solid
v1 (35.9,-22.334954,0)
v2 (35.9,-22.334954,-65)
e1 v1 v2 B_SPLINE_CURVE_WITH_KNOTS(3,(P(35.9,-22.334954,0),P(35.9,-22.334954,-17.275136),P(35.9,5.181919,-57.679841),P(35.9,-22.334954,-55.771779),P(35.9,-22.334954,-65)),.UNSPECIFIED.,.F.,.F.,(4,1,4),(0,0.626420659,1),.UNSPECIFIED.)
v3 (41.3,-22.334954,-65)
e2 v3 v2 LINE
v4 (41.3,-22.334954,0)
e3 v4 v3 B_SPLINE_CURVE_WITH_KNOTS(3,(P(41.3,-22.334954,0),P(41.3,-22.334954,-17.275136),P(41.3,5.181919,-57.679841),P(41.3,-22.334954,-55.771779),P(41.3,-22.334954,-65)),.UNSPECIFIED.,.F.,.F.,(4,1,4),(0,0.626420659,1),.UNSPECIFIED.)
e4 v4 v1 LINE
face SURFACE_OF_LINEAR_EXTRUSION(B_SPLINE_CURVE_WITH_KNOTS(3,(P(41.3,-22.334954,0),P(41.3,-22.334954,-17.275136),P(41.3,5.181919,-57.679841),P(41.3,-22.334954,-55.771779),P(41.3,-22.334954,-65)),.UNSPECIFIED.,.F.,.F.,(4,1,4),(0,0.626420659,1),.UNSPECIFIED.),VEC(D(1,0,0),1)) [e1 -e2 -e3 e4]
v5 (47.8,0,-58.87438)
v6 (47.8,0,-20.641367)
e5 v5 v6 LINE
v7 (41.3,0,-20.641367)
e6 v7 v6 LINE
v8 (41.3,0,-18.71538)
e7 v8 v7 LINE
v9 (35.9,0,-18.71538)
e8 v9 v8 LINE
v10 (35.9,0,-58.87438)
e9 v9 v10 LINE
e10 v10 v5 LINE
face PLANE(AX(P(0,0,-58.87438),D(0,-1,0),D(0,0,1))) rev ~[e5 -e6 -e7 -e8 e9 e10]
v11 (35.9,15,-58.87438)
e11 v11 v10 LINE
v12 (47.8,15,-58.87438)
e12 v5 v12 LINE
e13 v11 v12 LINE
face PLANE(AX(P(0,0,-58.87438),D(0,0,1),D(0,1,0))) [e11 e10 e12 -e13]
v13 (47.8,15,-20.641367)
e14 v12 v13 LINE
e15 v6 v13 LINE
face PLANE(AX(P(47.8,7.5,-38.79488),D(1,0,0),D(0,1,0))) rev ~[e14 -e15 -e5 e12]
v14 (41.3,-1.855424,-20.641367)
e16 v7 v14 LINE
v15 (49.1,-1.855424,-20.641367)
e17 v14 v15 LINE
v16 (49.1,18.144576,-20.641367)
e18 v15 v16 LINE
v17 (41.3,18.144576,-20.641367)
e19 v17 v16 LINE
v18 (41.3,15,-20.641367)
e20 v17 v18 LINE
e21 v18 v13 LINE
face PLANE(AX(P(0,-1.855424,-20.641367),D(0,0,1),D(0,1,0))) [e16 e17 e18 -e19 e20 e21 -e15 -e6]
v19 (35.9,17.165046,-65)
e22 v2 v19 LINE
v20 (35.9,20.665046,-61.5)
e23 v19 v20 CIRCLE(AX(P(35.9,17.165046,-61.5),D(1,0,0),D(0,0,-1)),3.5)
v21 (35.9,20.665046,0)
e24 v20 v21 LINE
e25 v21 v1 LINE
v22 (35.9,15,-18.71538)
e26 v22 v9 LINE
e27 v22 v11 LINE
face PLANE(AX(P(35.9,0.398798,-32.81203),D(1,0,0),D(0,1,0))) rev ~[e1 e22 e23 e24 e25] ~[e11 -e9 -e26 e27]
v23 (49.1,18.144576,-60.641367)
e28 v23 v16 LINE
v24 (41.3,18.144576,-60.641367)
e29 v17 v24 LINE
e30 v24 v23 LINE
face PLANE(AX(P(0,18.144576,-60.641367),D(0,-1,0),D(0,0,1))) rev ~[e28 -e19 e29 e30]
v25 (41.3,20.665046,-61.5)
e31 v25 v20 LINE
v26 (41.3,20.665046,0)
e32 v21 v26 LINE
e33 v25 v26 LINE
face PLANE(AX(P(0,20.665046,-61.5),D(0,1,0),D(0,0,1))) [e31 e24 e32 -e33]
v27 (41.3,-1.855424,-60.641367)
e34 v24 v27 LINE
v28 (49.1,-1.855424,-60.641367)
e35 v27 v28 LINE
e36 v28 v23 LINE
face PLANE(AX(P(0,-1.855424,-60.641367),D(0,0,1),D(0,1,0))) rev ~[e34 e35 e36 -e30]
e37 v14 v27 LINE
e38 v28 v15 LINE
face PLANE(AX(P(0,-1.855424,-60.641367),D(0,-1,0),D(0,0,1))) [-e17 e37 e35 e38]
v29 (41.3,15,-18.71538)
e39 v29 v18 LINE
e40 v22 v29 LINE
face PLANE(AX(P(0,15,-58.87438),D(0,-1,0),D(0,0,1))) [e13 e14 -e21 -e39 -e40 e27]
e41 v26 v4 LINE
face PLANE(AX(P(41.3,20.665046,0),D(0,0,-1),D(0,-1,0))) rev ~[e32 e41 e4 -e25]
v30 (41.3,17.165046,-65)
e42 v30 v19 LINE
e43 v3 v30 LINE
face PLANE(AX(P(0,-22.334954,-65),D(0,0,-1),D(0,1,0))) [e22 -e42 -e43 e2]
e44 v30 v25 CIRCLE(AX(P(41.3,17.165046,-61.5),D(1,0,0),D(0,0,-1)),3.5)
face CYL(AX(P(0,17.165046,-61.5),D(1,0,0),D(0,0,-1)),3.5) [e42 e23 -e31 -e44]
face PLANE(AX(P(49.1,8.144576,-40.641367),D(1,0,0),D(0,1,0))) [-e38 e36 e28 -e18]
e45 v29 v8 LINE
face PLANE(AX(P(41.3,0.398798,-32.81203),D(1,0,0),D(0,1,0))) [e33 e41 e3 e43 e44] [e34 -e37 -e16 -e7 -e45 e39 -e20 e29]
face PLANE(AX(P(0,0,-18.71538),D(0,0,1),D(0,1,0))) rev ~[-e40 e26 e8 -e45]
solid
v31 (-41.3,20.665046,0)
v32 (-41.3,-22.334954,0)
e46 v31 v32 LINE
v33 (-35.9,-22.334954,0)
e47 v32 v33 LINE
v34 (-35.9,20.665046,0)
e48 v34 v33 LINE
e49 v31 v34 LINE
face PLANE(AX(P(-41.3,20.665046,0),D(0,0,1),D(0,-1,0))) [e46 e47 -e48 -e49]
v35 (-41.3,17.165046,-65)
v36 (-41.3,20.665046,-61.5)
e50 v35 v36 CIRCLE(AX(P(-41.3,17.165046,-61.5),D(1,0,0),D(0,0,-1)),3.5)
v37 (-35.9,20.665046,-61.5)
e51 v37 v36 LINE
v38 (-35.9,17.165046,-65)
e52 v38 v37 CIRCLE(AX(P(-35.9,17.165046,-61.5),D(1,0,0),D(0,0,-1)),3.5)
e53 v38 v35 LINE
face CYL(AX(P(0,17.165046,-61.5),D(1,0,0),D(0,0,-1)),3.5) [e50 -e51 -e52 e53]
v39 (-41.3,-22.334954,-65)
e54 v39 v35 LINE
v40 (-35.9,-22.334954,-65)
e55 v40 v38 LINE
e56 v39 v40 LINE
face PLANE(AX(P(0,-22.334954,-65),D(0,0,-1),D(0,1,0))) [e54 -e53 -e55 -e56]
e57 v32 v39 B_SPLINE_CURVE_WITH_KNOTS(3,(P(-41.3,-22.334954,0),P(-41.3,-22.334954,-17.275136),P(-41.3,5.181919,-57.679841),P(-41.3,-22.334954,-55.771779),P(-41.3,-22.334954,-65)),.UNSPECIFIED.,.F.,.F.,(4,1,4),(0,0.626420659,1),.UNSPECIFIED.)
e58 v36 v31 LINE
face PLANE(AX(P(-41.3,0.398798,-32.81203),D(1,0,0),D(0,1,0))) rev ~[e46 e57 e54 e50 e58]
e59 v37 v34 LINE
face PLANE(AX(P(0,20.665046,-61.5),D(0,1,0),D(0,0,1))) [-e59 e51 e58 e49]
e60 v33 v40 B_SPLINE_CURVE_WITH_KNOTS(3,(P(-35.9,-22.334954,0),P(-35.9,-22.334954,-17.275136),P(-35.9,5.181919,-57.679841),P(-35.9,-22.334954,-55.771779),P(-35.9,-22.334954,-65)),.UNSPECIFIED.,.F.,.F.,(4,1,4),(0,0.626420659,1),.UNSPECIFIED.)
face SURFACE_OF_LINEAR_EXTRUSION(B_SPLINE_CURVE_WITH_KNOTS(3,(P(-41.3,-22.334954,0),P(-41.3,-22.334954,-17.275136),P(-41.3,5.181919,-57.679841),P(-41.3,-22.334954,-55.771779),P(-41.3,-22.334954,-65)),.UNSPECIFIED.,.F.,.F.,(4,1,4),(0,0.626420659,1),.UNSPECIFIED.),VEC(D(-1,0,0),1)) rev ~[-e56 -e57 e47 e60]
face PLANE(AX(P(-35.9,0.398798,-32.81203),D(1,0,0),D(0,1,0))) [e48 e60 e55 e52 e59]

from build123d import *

# Parameters (mm, degrees)
F0_R      = 1.75
F1_DEPTH  = 3
F3_DEPTH  = 41.3
F5_DEPTH  = 5.4
F6_W      = 20
F6_H      = 40
F7_DEPTH  = 49.1
F8_DEPTH  = 25
F9_W      = 15
F9_H      = 40.159
F10_DEPTH = 47.8


# Not quite as in the source:
# - a feature names something its author has since deleted; it is built from what else it names


with BuildPart() as f1:
    # F0 (on Top) → F1 (new body)
    with BuildSketch(Plane.XY):
        with BuildLine():
            Line((-41.5, -22.5), (41.5, -22.5))
            ThreePointArc((41.5, -22.5), (43.9748737342, -21.4748737342), (45, -19))
            Line((45, -19), (45, 19))
            ThreePointArc((45, 19), (43.9748737342, 21.4748737342), (41.5, 22.5))
            Line((41.5, 22.5), (-41.5, 22.5))
            ThreePointArc((-41.5, 22.5), (-43.9748737342, 21.4748737342), (-45, 19))
            Line((-45, 19), (-45, -19))
            ThreePointArc((-45, -19), (-43.9748737342, -21.4748737342), (-41.5, -22.5))
        make_face()
        with Locations((-30, -7.5)):
            Circle(F0_R, mode=Mode.SUBTRACT)
        with Locations((-15, -7.5)):
            Circle(F0_R, mode=Mode.SUBTRACT)
        with Locations((0, -7.5)):
            Circle(F0_R, mode=Mode.SUBTRACT)
        with Locations((15, -7.5)):
            Circle(F0_R, mode=Mode.SUBTRACT)
        with Locations((30, -7.5)):
            Circle(F0_R, mode=Mode.SUBTRACT)
        with Locations((-30, 7.5)):
            Circle(F0_R, mode=Mode.SUBTRACT)
        with Locations((-15, 7.5)):
            Circle(F0_R, mode=Mode.SUBTRACT)
        with Locations((0, 7.5)):
            Circle(F0_R, mode=Mode.SUBTRACT)
        with Locations((15.1128452271, 7.5)):
            Circle(F0_R, mode=Mode.SUBTRACT)
        with Locations((30, 7.5)):
            Circle(F0_R, mode=Mode.SUBTRACT)
    extrude(amount=F1_DEPTH)

    # F2 (on Right) → F3 (join, symmetric)
    with BuildSketch(Plane.YZ):
        with BuildLine():
            Line((20.66504623, -61.5), (20.66504623, 0))
            Line((20.66504623, 0), (-22.33495377, 0))
            add(Edge.make_bspline(
                [(-22.33495377, 0), (-22.33495377, -17.2751359642), (5.181919243, -57.6798408053), (-22.33495377, -55.771779269), (-22.33495377, -65)],
                knots=[0, 0, 0, 0, 0.6264206586, 1, 1, 1, 1], degree=3))
            Line((-22.33495377, -65), (17.16504623, -65))
            ThreePointArc((17.16504623, -65), (19.6399199641, -63.9748737342), (20.66504623, -61.5))
        make_face()
    extrude(amount=F3_DEPTH, both=True)

    # F5 (intersect, symmetric): faces of the model
    f5_faces = [f1.faces().sort_by_distance(p)[0] for p in [
        (-41.3, 2.0507565741, -31.3637201266),
        (41.3, 2.0507565741, -31.3637201266),
    ]]
    extrude(f5_faces, amount=F5_DEPTH, both=True, dir=(-1, 0, 0), mode=Mode.INTERSECT)

    # F6 (on Right) → F7 (join)
    with BuildSketch(Plane.YZ):
        with Locations((8.1445764424, -40.6413669884)):
            Rectangle(F6_W, F6_H)
    extrude(amount=F7_DEPTH)

    # F8 (cut): a face of the model
    f8_faces = [f1.faces().sort_by_distance(p)[0] for p in [
        (17.95, 18.1445764424, -40.6413669884),
    ]]
    extrude(f8_faces, amount=-F8_DEPTH, mode=Mode.SUBTRACT)

    # F9 (on Right) → F10 (cut)
    with BuildSketch(Plane.YZ):
        with Locations((7.5, -38.7948798435)):
            Rectangle(F9_W, F9_H)
    extrude(amount=F10_DEPTH, mode=Mode.SUBTRACT)


solid = f1.part
